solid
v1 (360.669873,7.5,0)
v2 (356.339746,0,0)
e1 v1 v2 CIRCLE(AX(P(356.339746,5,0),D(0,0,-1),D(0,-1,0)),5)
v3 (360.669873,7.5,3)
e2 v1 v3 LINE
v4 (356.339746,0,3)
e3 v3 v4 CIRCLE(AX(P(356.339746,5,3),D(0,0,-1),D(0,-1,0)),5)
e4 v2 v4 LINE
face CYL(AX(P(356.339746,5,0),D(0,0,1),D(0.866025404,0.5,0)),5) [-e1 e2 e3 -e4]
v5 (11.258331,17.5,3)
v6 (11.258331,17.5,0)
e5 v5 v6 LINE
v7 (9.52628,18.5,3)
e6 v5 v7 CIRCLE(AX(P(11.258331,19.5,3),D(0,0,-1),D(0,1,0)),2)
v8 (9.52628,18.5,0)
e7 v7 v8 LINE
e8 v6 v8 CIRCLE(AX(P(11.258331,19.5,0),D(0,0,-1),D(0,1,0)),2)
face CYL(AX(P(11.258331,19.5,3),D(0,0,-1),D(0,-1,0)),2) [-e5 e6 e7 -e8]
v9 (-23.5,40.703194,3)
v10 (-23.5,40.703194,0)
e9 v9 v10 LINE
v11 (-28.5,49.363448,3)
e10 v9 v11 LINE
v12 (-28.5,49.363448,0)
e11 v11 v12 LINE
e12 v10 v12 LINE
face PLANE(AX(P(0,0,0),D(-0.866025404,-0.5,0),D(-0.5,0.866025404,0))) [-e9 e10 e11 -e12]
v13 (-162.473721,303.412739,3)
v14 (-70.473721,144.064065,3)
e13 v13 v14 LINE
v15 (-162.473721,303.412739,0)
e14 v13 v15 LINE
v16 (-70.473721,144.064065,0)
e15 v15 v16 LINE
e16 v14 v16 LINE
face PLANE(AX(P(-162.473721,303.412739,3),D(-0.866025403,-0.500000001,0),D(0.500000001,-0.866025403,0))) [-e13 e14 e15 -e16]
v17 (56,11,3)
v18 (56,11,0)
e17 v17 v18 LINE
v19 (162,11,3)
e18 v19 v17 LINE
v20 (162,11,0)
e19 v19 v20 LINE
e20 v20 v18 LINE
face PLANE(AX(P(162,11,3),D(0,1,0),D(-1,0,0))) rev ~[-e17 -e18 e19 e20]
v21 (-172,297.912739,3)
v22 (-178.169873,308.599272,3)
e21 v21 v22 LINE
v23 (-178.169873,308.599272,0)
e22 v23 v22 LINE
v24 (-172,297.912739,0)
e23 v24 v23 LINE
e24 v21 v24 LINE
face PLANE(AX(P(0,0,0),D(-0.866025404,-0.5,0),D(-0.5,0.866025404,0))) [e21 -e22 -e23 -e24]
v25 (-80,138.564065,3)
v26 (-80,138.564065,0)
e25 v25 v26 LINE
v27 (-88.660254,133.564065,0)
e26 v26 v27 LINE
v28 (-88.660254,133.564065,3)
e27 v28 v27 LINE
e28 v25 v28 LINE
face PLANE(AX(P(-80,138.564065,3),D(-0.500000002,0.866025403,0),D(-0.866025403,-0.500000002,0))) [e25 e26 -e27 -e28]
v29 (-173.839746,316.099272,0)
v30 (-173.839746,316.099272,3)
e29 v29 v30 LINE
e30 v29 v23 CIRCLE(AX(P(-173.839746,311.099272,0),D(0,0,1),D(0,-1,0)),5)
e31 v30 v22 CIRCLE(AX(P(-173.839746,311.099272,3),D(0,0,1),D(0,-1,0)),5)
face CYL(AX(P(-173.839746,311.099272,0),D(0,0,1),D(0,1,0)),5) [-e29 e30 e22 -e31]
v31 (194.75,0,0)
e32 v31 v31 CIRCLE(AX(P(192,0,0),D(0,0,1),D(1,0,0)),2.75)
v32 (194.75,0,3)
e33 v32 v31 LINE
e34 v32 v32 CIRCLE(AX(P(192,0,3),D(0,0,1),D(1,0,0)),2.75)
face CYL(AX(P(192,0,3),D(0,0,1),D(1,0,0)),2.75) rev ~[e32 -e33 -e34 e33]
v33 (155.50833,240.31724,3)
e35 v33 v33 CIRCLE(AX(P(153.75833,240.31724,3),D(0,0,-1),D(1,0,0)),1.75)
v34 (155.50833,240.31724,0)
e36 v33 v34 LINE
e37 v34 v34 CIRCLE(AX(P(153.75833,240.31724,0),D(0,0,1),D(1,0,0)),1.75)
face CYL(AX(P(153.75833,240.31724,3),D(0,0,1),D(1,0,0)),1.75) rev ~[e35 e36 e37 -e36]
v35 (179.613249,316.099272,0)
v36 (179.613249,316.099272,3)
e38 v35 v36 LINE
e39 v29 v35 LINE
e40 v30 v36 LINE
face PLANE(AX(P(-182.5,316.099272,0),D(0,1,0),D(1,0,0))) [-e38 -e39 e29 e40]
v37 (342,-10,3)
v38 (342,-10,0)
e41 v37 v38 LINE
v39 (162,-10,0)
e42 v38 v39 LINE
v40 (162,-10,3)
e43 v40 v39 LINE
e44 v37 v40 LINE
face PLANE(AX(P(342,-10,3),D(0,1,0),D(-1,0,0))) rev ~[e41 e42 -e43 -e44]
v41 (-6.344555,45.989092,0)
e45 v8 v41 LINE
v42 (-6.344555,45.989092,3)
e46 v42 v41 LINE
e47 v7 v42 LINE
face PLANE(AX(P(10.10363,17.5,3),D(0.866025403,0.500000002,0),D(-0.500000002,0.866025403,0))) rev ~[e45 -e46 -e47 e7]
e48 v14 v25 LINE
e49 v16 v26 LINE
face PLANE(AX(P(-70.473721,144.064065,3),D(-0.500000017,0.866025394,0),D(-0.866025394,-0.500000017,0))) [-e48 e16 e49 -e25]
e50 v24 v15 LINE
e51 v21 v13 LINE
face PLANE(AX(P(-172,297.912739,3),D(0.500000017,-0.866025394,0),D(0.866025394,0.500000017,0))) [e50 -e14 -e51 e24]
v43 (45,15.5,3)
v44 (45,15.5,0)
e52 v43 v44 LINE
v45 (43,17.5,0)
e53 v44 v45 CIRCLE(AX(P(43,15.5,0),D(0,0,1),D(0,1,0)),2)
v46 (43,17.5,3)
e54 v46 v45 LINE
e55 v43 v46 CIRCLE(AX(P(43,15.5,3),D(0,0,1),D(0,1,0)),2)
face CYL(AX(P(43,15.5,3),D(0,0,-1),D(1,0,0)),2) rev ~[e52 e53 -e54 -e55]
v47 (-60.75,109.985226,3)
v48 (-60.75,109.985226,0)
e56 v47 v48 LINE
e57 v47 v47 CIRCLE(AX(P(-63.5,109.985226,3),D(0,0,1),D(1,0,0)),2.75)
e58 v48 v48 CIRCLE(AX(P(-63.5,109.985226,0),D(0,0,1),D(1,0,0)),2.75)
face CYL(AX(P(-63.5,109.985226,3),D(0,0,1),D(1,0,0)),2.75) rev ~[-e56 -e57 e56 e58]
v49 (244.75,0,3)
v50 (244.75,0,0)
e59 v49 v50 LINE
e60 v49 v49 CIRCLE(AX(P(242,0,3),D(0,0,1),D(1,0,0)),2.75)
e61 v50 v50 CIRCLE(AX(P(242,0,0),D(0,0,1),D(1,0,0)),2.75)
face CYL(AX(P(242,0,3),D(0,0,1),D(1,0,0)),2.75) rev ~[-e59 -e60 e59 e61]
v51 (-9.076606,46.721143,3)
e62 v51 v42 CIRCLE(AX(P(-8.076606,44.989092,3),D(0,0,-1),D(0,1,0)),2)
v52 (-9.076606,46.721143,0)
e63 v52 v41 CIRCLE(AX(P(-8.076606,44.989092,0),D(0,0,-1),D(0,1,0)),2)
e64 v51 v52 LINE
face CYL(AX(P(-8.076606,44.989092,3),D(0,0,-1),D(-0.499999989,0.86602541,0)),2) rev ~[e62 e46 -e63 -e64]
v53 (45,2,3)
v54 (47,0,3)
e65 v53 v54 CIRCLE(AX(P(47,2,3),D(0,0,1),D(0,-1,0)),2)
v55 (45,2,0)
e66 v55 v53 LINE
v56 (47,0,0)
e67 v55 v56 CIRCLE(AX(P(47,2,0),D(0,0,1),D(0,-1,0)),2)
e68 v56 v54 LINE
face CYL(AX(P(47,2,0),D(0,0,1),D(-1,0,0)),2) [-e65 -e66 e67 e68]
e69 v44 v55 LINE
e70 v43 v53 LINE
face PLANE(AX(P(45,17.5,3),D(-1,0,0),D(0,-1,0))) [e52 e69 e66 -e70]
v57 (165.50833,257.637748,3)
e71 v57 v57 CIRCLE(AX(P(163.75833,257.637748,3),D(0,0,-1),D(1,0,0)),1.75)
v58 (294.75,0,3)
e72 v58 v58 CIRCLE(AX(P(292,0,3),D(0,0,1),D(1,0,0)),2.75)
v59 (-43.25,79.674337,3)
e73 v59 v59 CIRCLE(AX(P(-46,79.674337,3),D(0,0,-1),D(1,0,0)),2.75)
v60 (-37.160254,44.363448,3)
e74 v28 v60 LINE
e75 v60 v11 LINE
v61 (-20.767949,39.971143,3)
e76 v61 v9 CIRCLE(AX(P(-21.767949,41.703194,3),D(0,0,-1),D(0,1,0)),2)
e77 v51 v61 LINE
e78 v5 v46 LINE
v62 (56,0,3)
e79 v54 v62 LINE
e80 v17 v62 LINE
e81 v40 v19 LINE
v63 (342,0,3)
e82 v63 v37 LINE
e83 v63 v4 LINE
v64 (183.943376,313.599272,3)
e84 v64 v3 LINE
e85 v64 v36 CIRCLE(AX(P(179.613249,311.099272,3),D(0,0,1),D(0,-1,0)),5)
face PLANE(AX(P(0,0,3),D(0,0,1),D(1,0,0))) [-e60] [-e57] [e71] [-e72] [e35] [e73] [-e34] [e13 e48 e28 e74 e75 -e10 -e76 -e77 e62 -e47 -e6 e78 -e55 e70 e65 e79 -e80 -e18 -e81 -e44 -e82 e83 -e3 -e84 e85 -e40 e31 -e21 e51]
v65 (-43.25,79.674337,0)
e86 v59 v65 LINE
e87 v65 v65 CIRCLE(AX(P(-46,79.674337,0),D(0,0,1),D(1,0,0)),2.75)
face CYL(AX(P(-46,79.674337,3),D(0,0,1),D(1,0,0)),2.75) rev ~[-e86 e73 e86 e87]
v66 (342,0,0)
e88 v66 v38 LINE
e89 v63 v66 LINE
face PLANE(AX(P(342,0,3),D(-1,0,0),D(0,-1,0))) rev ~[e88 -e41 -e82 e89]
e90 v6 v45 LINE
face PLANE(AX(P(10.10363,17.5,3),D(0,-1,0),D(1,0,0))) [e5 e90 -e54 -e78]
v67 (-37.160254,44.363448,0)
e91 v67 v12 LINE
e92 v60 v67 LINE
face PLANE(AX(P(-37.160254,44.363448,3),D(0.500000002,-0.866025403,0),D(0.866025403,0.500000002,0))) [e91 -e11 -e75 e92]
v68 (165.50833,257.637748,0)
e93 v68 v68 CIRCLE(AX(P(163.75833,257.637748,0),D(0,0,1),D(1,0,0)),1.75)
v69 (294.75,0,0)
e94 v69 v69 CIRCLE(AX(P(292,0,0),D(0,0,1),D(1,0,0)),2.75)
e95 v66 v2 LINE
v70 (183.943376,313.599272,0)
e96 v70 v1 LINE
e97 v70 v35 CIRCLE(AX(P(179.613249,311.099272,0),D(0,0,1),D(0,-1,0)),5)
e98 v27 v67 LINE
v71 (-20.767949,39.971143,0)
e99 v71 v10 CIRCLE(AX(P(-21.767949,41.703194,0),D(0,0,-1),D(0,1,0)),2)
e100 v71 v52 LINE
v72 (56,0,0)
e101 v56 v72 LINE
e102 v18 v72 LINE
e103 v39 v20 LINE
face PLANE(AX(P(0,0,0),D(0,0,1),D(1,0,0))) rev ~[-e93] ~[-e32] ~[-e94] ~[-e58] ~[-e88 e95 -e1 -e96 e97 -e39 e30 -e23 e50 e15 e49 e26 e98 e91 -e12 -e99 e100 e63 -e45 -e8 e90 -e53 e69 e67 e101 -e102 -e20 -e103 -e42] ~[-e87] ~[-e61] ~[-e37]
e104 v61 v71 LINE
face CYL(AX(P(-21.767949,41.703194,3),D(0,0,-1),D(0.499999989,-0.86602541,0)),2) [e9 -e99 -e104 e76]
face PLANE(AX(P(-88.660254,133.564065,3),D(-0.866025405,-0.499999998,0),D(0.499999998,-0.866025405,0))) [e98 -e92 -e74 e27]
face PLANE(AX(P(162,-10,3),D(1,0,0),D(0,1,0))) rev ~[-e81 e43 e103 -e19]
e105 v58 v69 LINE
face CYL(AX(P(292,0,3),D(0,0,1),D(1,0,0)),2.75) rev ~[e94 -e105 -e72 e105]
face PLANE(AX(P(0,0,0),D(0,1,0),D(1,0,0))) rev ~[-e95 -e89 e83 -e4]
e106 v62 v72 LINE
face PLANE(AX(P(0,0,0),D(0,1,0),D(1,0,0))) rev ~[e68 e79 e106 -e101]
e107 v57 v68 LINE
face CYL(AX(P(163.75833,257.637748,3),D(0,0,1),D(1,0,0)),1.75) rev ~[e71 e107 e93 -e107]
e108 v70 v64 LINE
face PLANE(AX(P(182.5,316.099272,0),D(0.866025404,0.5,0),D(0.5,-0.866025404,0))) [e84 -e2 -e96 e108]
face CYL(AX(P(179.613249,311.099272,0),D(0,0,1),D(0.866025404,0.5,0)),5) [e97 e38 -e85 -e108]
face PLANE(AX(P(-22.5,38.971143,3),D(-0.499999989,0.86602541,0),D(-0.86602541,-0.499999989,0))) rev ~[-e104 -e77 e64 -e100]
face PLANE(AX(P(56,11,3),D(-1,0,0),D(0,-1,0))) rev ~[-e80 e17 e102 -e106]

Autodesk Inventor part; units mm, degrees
ref_plane "YZ Plane" through (0, 0, 0) normal (1, 0, 0) x (0, 1, 0)
ref_plane "XZ Plane" through (0, 0, 0) normal (0, 1, 0) x (-1, 0, 0)
ref_plane "XY Plane" through (0, 0, 0) normal (0, 0, 1) x (1, 0, 0)
sketch "Sketch7" plane through (0, 0, 0) normal (0, 0, 1) x (1, 0, 0)
  line L0 (182.5, 316.099272) -> (365, 0)
  line L1 (365, 0) -> (182.5, -316.099272)
  line L2 (182.5, -316.099272) -> (-182.5, -316.099272)
  line L3 (-182.5, -316.099272) -> (-365, 0)
  line L4 (-365, 0) -> (-182.5, 316.099272)
  line L5 (-182.5, 316.099272) -> (182.5, 316.099272)
  line L6 (0, 0) -> (-182.5, 316.099272)
  line L7 (0, 0) -> (365, 0)
  line L8 (0, 0) -> (0, 100)
  line L9 (0, 0) -> (100, 0) construction
  dimension "d56" = 365
  dimension "d69" = 100
  dimension "d70" = 90
  dimension "d71" = 30
extrude "Extrusion6" add sketch "Sketch7" along normal blind 3 contours L0 L7 L6 L5
sketch "Sketch8" plane through (0, 0, 3) normal (0, 0, 1) x (1, 0, 0)
  line L0 (37.655445, -30.221143) -> (-7.344555, 47.721143)
  line L1 (-7.344555, 47.721143) -> (-37.655445, 30.221143)
  line L2 (-37.655445, 30.221143) -> (7.344555, -47.721143)
  line L3 (7.344555, -47.721143) -> (37.655445, -30.221143)
  line L4 (37.655445, -30.221143) -> (-37.655445, 30.221143) construction
  line L5 (-7.344555, 47.721143) -> (7.344555, -47.721143) construction
  line L6 (37.655445, -30.221143) -> (127.655445, -30.221143) construction
  line L7 (-45, 17.5) -> (45, 17.5)
  line L8 (45, 17.5) -> (45, -17.5)
  line L9 (45, -17.5) -> (-45, -17.5)
  line L10 (-45, -17.5) -> (-45, 17.5)
  line L11 (-182.5, 316.099272) -> (0, 0)
  line L12 (-45, 17.5) -> (45, -17.5) construction
  line L13 (45, 17.5) -> (-45, -17.5) construction
  line L14 (-45, 17.5) -> (45, 17.5) construction
  dimension "d60" = 90
  dimension "d61" = 120
  dimension "d62" = 35
  dimension "d63" = 90
  dimension "d64" = 0
  dimension "d65" = 35
extrude "Extrusion7" cut sketch "Sketch8" against normal blind 3
sketch "Sketch9" plane through (0, 0, 3) normal (0, 0, 1) x (1, 0, 0)
  line L0 (0, 0) -> (152.5, 264.137748)
  line L1 (0, 0) -> (305, 0) construction
  line L2 (152.5, 264.137748) -> (163.75833, 257.637748)
  line L3 (152.5, 264.137748) -> (165.5, 264.137748) construction
  circle A0 centre (163.75833, 257.637748) radius 1.75
  line L4 (163.75833, 257.637748) -> (153.75833, 240.31724)
  circle A1 centre (153.75833, 240.31724) radius 1.75
  dimension "d72" = 305
  dimension "d73" = 60
  dimension "d74" = 13
  dimension "d75" = 30
  dimension "d76" = 3.5
  dimension "d77" = 20
  dimension "d78" = 90
  dimension "d79" = 3.5
extrude "Extrusion8" cut sketch "Sketch9" against normal blind 3
fillet "Fillet1" radius 5 3 edges at (182.5, 316.0993, 1.5) (365, 0, 1.5) (-182.5, 316.0993, 1.5)
fillet "Fillet2" radius 2 2 edges at (45, 17.5, 1.5) (-7.3446, 47.7211, 1.5)
fillet "Fillet3" radius 2 2 edges at (45, 0, 1.5) (10.1036, 17.5, 1.5)
fillet "Fillet4" radius 2 1 edges at (-22.5, 38.9711, 1.5)
sketch "Sketch13" plane through (0, 0, 3) normal (0, 0, 1) x (1, 0, 0)
  line L0 (-178.169873, 308.599272) -> (-23.5, 40.703194)
  line L1 (-23.5, 40.703194) -> (-28.5, 49.363448)
  line L2 (-28.5, 49.363448) -> (-80, 138.564065)
  line L3 (-80, 138.564065) -> (-88.660254, 133.564065)
  line L4 (-88.660254, 133.564065) -> (-37.160254, 44.363448)
  line L5 (-37.160254, 44.363448) -> (-28.5, 49.363448)
  line L6 (-28.5, 49.363448) -> (74.5, 49.363448) construction
  line L7 (47, 0) -> (356.339746, 0)
  line L8 (47, 0) -> (162, 0)
  line L9 (162, 0) -> (342, 0)
  line L10 (342, 0) -> (342, -10)
  line L11 (342, -10) -> (162, -10)
  line L12 (162, -10) -> (162, 0)
  point P0 (0, 0)
  dimension "d123" = 10
  dimension "d124" = 103
  dimension "d125" = 120
  dimension "d126" = 10
  dimension "d127" = 115
  dimension "d128" = 180
  dimension "d129" = 10
extrude "Extrusion12" add sketch "Sketch13" against normal blind 3
sketch "Sketch14" plane through (0, 0, 3) normal (0, 0, 1) x (1, 0, 0)
  line L0 (-178.169873, 308.599272) -> (-80, 138.564065)
  line L1 (-80, 138.564065) -> (-80, 138.564065)
  line L2 (-80, 138.564065) -> (-172, 297.912739)
  line L3 (-172, 297.912739) -> (-162.473721, 303.412739)
  line L4 (-162.473721, 303.412739) -> (-70.473721, 144.064065)
  line L5 (-70.473721, 144.064065) -> (-80, 138.564065)
  line L6 (47, 0) -> (162, 0)
  line L7 (47, 0) -> (56, 0)
  line L8 (56, 0) -> (162, 0)
  line L9 (162, 0) -> (162, 11)
  line L10 (162, 11) -> (56, 11)
  line L11 (56, 11) -> (56, 0)
  point P0 (0, 0)
  dimension "d132" = 0
  dimension "d133" = 184
  dimension "d134" = 11
  dimension "d135" = 9
  dimension "d136" = 106
  dimension "d137" = 11
extrude "Extrusion13" cut sketch "Sketch14" against normal blind 3
sketch "Sketch15" plane through (0, 0, 3) normal (0, 0, 1) x (1, 0, 0)
  line L0 (342, 0) -> (342, -10)
  line L1 (342, 0) -> (292, 0)
  circle A0 centre (292, 0) radius 2.75
  circle A1 centre (242, 0) radius 2.75
  circle A2 centre (192, 0) radius 2.75
  line L2 (-28.5, 49.363448) -> (-37.160254, 44.363448)
  line L3 (-28.5, 49.363448) -> (-46, 79.674337)
  line L4 (-28.5, 49.363448) -> (6.5, 49.363448) construction
  circle A3 centre (-46, 79.674337) radius 2.75
  circle A4 centre (-63.5, 109.985226) radius 2.75
  point P0 (0, 0)
  dimension "d140" = 50
  dimension "d141" = 5.5
  dimension "d144" = 50
  dimension "d149" = 35
  dimension "d150" = 120
  dimension "d151" = 5.5
  dimension "d154" = 35
extrude "Extrusion14" cut sketch "Sketch15" against normal blind 3
sketch "Sketch16" plane through (0, 0, 0) normal (0, 0, -1) x (-1, 0, 0)
  line L0 (181.006538, 319.907407) -> (181.006538, -10.092593)
  line L1 (181.006538, -10.092593) -> (-363.993462, -10.092593)
  line L2 (-363.993462, -10.092593) -> (-363.993462, 319.907407)
  line L3 (-363.993462, 319.907407) -> (181.006538, 319.907407)
  line L4 (-342, -10) -> (-162, -10)
  point P0 (0, 0)
  dimension "d161" = 545
  dimension "d162" = 330
properties part number "Acrylic_top"
